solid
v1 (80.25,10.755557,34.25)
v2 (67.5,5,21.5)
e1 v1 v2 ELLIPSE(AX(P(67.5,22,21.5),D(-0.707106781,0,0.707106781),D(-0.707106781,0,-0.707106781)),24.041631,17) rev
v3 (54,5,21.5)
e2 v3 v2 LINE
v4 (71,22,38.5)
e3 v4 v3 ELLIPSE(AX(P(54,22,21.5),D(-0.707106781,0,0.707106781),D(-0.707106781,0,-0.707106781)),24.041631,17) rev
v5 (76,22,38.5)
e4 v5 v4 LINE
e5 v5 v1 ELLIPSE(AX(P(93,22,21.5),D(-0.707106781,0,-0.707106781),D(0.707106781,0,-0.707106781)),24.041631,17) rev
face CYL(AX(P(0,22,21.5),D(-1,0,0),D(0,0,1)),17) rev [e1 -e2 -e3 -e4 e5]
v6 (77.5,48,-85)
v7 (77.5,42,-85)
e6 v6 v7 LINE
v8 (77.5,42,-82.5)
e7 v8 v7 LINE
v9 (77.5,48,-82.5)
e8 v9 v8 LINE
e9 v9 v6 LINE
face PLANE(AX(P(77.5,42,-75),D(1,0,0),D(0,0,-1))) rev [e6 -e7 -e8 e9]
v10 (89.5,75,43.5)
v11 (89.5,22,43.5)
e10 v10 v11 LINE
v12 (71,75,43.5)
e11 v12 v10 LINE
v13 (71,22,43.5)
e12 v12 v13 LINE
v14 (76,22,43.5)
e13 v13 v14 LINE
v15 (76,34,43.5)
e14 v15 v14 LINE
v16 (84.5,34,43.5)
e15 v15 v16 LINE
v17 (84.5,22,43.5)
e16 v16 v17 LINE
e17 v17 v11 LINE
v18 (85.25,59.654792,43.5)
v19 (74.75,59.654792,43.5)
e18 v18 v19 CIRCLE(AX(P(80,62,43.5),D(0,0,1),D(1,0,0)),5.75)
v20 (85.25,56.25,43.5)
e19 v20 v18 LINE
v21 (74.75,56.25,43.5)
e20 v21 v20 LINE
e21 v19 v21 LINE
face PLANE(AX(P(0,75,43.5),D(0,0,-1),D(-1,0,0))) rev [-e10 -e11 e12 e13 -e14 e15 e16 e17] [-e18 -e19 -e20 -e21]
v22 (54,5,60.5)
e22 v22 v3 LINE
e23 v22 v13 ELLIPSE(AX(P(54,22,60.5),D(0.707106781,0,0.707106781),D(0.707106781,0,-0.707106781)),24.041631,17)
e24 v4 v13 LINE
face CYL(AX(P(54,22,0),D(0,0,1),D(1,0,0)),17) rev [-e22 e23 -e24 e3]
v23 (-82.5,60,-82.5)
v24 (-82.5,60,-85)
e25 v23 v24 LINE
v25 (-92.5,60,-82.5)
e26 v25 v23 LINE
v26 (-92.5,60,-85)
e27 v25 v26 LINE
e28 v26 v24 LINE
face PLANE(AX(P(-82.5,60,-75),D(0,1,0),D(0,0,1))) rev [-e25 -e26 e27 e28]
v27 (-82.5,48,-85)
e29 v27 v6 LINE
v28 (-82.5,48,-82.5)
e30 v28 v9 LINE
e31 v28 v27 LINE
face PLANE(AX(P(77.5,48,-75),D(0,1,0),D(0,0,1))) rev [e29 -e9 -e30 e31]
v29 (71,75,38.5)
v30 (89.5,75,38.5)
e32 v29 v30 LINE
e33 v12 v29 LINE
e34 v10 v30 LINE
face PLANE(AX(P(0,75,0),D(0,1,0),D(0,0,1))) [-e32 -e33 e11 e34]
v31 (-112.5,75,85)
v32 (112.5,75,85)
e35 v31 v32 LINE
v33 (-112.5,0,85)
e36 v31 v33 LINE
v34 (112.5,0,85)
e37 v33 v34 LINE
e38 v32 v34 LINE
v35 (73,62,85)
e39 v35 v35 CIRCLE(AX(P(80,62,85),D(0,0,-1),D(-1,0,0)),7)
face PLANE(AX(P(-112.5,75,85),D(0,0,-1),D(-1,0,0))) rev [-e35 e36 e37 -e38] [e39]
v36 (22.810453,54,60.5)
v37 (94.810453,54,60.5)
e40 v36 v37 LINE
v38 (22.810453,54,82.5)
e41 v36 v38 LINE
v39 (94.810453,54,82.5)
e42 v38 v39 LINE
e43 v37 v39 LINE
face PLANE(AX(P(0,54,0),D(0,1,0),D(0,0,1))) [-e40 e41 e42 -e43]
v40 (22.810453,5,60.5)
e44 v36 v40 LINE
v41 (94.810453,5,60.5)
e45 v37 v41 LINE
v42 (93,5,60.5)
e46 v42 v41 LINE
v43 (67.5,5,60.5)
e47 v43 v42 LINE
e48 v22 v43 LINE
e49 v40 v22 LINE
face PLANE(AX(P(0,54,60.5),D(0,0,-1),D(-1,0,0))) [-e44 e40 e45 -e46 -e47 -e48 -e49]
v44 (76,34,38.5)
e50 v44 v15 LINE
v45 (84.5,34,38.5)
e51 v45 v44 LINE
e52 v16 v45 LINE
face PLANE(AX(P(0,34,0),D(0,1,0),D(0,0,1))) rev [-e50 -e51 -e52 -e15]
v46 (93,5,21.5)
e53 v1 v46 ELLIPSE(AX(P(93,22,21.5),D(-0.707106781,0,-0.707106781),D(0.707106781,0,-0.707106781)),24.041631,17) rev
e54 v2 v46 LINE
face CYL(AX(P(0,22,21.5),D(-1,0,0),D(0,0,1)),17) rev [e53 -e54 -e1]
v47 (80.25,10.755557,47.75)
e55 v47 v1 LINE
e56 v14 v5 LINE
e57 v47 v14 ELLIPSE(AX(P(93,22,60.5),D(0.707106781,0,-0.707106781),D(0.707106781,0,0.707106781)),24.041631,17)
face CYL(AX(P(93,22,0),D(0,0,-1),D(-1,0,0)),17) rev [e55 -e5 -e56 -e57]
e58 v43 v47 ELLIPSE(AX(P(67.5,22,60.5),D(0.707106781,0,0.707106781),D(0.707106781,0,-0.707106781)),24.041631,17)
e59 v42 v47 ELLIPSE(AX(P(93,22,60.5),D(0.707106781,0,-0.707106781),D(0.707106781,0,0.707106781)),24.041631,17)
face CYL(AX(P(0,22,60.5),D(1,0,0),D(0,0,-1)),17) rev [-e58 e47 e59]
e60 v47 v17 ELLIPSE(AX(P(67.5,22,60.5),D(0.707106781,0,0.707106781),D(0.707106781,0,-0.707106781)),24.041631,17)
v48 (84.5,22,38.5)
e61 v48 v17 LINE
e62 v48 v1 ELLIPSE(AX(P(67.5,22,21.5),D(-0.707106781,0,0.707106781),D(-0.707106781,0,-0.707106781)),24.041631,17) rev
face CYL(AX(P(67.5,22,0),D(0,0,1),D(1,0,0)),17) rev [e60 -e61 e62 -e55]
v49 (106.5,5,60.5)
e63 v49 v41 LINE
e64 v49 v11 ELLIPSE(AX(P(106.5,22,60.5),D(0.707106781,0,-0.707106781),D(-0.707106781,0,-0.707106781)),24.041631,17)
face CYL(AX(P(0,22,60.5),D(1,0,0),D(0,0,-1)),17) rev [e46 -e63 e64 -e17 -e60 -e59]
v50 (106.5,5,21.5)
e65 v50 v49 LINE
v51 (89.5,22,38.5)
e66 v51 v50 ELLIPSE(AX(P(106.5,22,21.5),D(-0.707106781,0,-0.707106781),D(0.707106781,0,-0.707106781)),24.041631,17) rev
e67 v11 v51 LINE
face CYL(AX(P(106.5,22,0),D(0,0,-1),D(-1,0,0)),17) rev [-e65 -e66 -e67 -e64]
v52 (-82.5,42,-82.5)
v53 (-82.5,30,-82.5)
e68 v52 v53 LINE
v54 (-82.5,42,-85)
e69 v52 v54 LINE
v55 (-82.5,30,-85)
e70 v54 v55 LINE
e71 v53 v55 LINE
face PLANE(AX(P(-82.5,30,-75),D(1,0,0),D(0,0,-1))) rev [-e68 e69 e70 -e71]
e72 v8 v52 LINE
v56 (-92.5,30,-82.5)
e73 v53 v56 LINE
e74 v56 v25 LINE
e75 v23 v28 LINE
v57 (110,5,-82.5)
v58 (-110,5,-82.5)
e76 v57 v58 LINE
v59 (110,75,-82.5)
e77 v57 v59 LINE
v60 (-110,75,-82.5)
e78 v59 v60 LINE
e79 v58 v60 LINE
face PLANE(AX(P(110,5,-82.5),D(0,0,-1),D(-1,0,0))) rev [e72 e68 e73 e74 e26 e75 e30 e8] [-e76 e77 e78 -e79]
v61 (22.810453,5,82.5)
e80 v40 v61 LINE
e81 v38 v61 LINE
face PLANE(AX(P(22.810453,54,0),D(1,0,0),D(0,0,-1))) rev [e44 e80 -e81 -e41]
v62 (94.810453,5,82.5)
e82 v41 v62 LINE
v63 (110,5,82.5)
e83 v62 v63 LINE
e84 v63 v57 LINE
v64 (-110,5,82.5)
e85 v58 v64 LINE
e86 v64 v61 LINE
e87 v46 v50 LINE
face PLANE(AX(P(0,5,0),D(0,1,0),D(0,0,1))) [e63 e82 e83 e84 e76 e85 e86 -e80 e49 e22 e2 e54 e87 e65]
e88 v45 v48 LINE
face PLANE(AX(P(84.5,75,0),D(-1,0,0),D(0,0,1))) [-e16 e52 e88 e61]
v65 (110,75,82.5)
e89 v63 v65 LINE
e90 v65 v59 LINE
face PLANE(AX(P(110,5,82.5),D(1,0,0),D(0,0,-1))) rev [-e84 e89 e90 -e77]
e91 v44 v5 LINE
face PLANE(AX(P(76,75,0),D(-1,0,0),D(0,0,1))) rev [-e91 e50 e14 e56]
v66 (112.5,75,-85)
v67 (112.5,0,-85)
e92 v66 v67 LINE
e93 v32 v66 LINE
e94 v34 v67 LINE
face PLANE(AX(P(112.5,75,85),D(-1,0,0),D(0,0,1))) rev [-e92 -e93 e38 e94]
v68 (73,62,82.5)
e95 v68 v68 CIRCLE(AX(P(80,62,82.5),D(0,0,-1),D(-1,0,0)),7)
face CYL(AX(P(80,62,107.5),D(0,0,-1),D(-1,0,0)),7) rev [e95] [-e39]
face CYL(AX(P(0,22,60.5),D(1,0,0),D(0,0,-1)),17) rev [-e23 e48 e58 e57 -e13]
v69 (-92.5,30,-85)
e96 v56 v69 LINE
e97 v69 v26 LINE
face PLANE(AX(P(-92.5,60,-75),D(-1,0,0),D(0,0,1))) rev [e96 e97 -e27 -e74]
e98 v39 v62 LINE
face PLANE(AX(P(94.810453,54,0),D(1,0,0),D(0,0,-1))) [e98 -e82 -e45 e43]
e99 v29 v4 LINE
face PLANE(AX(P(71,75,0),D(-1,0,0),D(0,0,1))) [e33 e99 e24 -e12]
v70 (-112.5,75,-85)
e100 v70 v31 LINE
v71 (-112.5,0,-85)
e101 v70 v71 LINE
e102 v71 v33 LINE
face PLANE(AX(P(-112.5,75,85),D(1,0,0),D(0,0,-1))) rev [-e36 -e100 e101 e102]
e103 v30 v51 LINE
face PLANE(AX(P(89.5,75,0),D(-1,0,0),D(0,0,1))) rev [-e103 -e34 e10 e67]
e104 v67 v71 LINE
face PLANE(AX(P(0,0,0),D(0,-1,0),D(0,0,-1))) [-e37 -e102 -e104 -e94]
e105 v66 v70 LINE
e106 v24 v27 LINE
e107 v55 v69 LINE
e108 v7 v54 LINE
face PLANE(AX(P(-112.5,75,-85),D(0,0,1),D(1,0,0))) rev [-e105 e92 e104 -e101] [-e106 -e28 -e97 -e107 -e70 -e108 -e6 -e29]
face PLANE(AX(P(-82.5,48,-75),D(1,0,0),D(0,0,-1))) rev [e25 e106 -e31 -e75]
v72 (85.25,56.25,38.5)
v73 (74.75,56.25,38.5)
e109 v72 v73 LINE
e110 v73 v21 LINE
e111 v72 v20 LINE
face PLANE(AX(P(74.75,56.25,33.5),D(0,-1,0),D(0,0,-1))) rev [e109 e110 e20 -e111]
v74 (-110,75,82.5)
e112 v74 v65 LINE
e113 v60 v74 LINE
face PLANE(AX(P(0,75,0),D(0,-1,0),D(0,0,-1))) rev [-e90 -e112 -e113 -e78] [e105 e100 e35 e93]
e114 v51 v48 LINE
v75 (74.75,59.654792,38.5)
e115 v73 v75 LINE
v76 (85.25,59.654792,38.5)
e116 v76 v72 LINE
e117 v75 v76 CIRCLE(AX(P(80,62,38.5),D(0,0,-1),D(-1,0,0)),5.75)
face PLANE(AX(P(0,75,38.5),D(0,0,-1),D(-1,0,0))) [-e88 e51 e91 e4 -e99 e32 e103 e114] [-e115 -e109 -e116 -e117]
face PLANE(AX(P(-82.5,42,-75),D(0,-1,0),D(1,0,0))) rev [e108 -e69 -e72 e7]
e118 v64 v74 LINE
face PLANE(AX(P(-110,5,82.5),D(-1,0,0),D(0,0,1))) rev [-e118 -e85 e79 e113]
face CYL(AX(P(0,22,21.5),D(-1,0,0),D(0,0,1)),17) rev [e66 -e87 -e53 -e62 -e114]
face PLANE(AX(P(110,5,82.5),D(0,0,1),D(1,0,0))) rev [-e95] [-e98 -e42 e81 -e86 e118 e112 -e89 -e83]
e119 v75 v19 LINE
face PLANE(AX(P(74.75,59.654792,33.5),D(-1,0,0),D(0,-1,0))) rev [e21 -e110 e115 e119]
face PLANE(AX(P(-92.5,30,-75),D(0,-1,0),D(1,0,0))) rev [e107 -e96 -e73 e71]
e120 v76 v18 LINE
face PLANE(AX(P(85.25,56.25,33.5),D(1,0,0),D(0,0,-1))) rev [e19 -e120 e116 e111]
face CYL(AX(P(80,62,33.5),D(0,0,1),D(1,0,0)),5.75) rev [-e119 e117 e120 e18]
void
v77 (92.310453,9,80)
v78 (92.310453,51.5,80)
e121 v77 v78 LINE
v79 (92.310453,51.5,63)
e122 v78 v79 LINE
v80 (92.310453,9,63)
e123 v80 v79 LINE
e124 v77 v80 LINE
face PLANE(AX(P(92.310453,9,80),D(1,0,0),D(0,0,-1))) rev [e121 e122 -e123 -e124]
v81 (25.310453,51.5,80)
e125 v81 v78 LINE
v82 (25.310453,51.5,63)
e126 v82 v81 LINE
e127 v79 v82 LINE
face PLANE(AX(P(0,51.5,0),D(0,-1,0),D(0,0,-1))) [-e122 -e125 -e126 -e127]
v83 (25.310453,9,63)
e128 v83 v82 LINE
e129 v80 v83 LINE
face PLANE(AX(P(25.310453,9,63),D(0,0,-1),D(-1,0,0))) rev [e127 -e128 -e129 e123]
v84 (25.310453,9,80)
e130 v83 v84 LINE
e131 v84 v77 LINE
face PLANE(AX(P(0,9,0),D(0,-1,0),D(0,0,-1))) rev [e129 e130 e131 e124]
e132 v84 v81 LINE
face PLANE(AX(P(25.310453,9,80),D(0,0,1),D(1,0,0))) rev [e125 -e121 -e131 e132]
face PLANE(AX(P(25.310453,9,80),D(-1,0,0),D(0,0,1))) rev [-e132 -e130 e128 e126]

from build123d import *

# Parameters (mm, degrees)
SKETCH1_W                = 225
SKETCH1_H                = 170
BOSS_EXTRUDE1_DEPTH      = 75
SKETCH2_W                = 220
SKETCH2_H                = 165
CUT_EXTRUDE1_DEPTH       = 70
CUT_EXTRUDE2_DEPTH       = 10
SKETCH6_W                = 72
SKETCH6_H                = 22
BOSS_EXTRUDE2_DEPTH      = 49
SKETCH8_R                = 7
CUT_EXTRUDE3_DEPTH       = 25
SKETCH6_4_W              = 5
SKETCH6_4_H              = 5
BOSS_EXTRUDE4_DEPTH      = 70
BOSS_EXTRUDE5_DEPTH      = 40
BOSS_EXTRUDE5_DEPTH_BACK = 1
BOSS_EXTRUDE5_START      = 30
SKETCH11_W               = 8.5
SKETCH11_H               = 5
CUT_EXTRUDE4_DEPTH       = 10
CUT_EXTRUDE5_START       = -2.5
SKETCH13_W               = 67
SKETCH13_H               = 17
CUT_EXTRUDE5_DEPTH       = 42.5
FILLET1_R                = 17


with BuildPart() as part:
    # Sketch1 → Boss-Extrude1 (new body)
    with BuildSketch(Plane(origin=(0, 0, 0), x_dir=(1, 0, 0), z_dir=(0, 1, 0))):
        Rectangle(SKETCH1_W, SKETCH1_H)
    extrude(amount=BOSS_EXTRUDE1_DEPTH)

    # Sketch2 → Cut-Extrude1 (cut)
    with BuildSketch(Plane(origin=(0, 75, 0), x_dir=(1, 0, 0), z_dir=(0, 1, 0))):
        Rectangle(SKETCH2_W, SKETCH2_H)
    extrude(amount=-CUT_EXTRUDE1_DEPTH, mode=Mode.SUBTRACT)

    # Sketch5 → Cut-Extrude2 (cut)
    with BuildSketch(Plane(origin=(0, 0, -85), x_dir=(-1, 0, 0), z_dir=(0, 0, -1))):
        Polygon((92.5, 60), (92.5, 30), (82.5, 30), (82.5, 42), (-77.5, 42), (-77.5, 48), (82.5, 48), (82.5, 60), align=None)
    extrude(amount=-CUT_EXTRUDE2_DEPTH, mode=Mode.SUBTRACT)

    # Sketch6 → Boss-Extrude2 (add)
    with BuildSketch(Plane(origin=(0, 5, 0), x_dir=(1, 0, 0), z_dir=(0, 1, 0))):
        with Locations((58.810452566, -71.5)):
            Rectangle(SKETCH6_W, SKETCH6_H)
    extrude(amount=BOSS_EXTRUDE2_DEPTH)

    # Sketch8 → Cut-Extrude3 (cut)
    with BuildSketch(Plane(origin=(0, 0, 82.5), x_dir=(-1, 0, 0), z_dir=(0, 0, -1))):
        with Locations((-80, 62)):
            Circle(SKETCH8_R)
    extrude(amount=-CUT_EXTRUDE3_DEPTH, mode=Mode.SUBTRACT)

    # Sketch6<4> → Boss-Extrude4 (add)
    with BuildSketch(Plane(origin=(0, 5, 0), x_dir=(1, 0, 0), z_dir=(0, 1, 0))):
        with Locations((73.5, -41)):
            Rectangle(SKETCH6_4_W, SKETCH6_4_H)
        with Locations((87, -41)):
            Rectangle(SKETCH6_4_W, SKETCH6_4_H)
    extrude(amount=BOSS_EXTRUDE4_DEPTH)

    # Sketch11 → Boss-Extrude5 (add, two sides: drawn at the far end of the back side and taken through both)
    with BuildSketch(Plane(origin=(0, 5, 0), x_dir=(1, 0, 0), z_dir=(0, 1, 0)).offset(BOSS_EXTRUDE5_START - BOSS_EXTRUDE5_DEPTH_BACK)):
        with Locations((80.25, -41)):
            Rectangle(SKETCH11_W, SKETCH11_H)
    extrude(amount=BOSS_EXTRUDE5_DEPTH + BOSS_EXTRUDE5_DEPTH_BACK)

    # Sketch12 → Cut-Extrude4 (cut)
    with BuildSketch(Plane.XY.offset(43.5)):
        with BuildLine():
            Line((74.75, 59.65479212), (74.75, 56.25))
            Line((74.75, 56.25), (85.25, 56.25))
            Line((85.25, 56.25), (85.25, 59.65479212))
            ThreePointArc((85.25, 59.65479212), (80, 67.75), (74.75, 59.65479212))
        make_face()
    extrude(amount=-CUT_EXTRUDE4_DEPTH, mode=Mode.SUBTRACT)

    # Sketch13 → Cut-Extrude5 (cut)
    with BuildSketch(Plane(origin=(0, 54, 0), x_dir=(1, 0, 0), z_dir=(0, 1, 0)).offset(CUT_EXTRUDE5_START)):
        with Locations((58.810452566, -71.5)):
            Rectangle(SKETCH13_W, SKETCH13_H)
    extrude(amount=-CUT_EXTRUDE5_DEPTH, mode=Mode.SUBTRACT)

    # Fillet1
    # the kernel refuses this fillet: 17 mm, written as the material it adds along each edge
    with BuildSketch(Plane(origin=(84.5, 5, 38.5), x_dir=(-1, 0, 0), z_dir=(0, 0, 1)), Plane(origin=(89.5, 5, 38.5), x_dir=(0, 0, -1), z_dir=(-1, 0, 0)), Plane(origin=(71, 5, 43.5), x_dir=(0, 0, 1), z_dir=(1, 0, 0)), Plane(origin=(76, 5, 43.5), x_dir=(1, 0, 0), z_dir=(0, 0, -1)), Plane(origin=(71, 5, 38.5), x_dir=(-1, 0, 0), z_dir=(0, 0, 1)), Plane(origin=(76, 5, 38.5), x_dir=(0, 0, -1), z_dir=(-1, 0, 0)), Plane(origin=(84.5, 5, 43.5), x_dir=(0, 0, 1), z_dir=(1, 0, 0)), Plane(origin=(89.5, 5, 43.5), x_dir=(1, 0, 0), z_dir=(0, 0, -1))) as fillet1_piece_1:
        with BuildLine():
            CenterArc((FILLET1_R, -FILLET1_R), FILLET1_R, 90, 90)
            Line((0, -FILLET1_R), (-FILLET1_R * 0.02, -FILLET1_R))
            Line((-FILLET1_R * 0.02, -FILLET1_R), (-FILLET1_R * 0.02, FILLET1_R * 0.02))
            Line((-FILLET1_R * 0.02, FILLET1_R * 0.02), (FILLET1_R, FILLET1_R * 0.02))
            Line((FILLET1_R, FILLET1_R * 0.02), (FILLET1_R, 0))
        make_face()
    extrude(amount=5)
    with BuildSketch(Plane(origin=(84.5, 5, -4), x_dir=(-1, 0, 0), z_dir=(0, 0, 1))) as fillet1_piece_2a_section:
        with BuildLine():
            CenterArc((FILLET1_R, -FILLET1_R), FILLET1_R, 90, 90)
            Line((0, -FILLET1_R), (-FILLET1_R * 0.02, -FILLET1_R))
            Line((-FILLET1_R * 0.02, -FILLET1_R), (-FILLET1_R * 0.02, FILLET1_R * 0.02))
            Line((-FILLET1_R * 0.02, FILLET1_R * 0.02), (FILLET1_R, FILLET1_R * 0.02))
            Line((FILLET1_R, FILLET1_R * 0.02), (FILLET1_R, 0))
        make_face()
    fillet1_piece_2a = extrude(amount=47.5, mode=Mode.PRIVATE)
    fillet1_piece_2a = split(fillet1_piece_2a, bisect_by=Plane(origin=(80.651283057, 8.848716943, 38.5), z_dir=(0, 0, -1)), keep=Keep.TOP, mode=Mode.PRIVATE)
    with BuildSketch(Plane(origin=(89.5, 5, 38.5), x_dir=(0, 0, -1), z_dir=(-1, 0, 0))) as fillet1_piece_2b_section:
        with BuildLine():
            CenterArc((FILLET1_R, -FILLET1_R), FILLET1_R, 90, 90)
            Line((0, -FILLET1_R), (-FILLET1_R * 0.02, -FILLET1_R))
            Line((-FILLET1_R * 0.02, -FILLET1_R), (-FILLET1_R * 0.02, FILLET1_R * 0.02))
            Line((-FILLET1_R * 0.02, FILLET1_R * 0.02), (FILLET1_R, FILLET1_R * 0.02))
            Line((FILLET1_R, FILLET1_R * 0.02), (FILLET1_R, 0))
        make_face()
    fillet1_piece_2b = extrude(amount=47.5, mode=Mode.PRIVATE)
    fillet1_piece_2b = split(fillet1_piece_2b, bisect_by=Plane(origin=(84.5, 8.848716943, 34.651283057), z_dir=(-1, 0, 0)), keep=Keep.TOP, mode=Mode.PRIVATE)
    fillet1_piece_2 = fillet1_piece_2a & fillet1_piece_2b
    add(fillet1_piece_2)
    with BuildSketch(Plane(origin=(84.5, 5, 38.5), x_dir=(-1, 0, 0), z_dir=(0, 0, 1))) as fillet1_piece_3a_section:
        with BuildLine():
            CenterArc((FILLET1_R, -FILLET1_R), FILLET1_R, 90, 90)
            Line((0, -FILLET1_R), (-FILLET1_R * 0.02, -FILLET1_R))
            Line((-FILLET1_R * 0.02, -FILLET1_R), (-FILLET1_R * 0.02, FILLET1_R * 0.02))
            Line((-FILLET1_R * 0.02, FILLET1_R * 0.02), (FILLET1_R, FILLET1_R * 0.02))
            Line((FILLET1_R, FILLET1_R * 0.02), (FILLET1_R, 0))
        make_face()
    fillet1_piece_3a = extrude(amount=47.5, mode=Mode.PRIVATE)
    fillet1_piece_3a = split(fillet1_piece_3a, bisect_by=Plane(origin=(80.651283057, 8.848716943, 43.5), z_dir=(0, 0, 1)), keep=Keep.TOP, mode=Mode.PRIVATE)
    with BuildSketch(Plane(origin=(42, 5, 43.5), x_dir=(0, 0, 1), z_dir=(1, 0, 0))) as fillet1_piece_3b_section:
        with BuildLine():
            CenterArc((FILLET1_R, -FILLET1_R), FILLET1_R, 90, 90)
            Line((0, -FILLET1_R), (-FILLET1_R * 0.02, -FILLET1_R))
            Line((-FILLET1_R * 0.02, -FILLET1_R), (-FILLET1_R * 0.02, FILLET1_R * 0.02))
            Line((-FILLET1_R * 0.02, FILLET1_R * 0.02), (FILLET1_R, FILLET1_R * 0.02))
            Line((FILLET1_R, FILLET1_R * 0.02), (FILLET1_R, 0))
        make_face()
    fillet1_piece_3b = extrude(amount=47.5, mode=Mode.PRIVATE)
    fillet1_piece_3b = split(fillet1_piece_3b, bisect_by=Plane(origin=(84.5, 8.848716943, 47.348716943), z_dir=(-1, 0, 0)), keep=Keep.TOP, mode=Mode.PRIVATE)
    fillet1_piece_3 = fillet1_piece_3a & fillet1_piece_3b
    add(fillet1_piece_3)
    with BuildSketch(Plane(origin=(132, 5, 38.5), x_dir=(0, 0, -1), z_dir=(-1, 0, 0))) as fillet1_piece_4a_section:
        with BuildLine():
            CenterArc((FILLET1_R, -FILLET1_R), FILLET1_R, 90, 90)
            Line((0, -FILLET1_R), (-FILLET1_R * 0.02, -FILLET1_R))
            Line((-FILLET1_R * 0.02, -FILLET1_R), (-FILLET1_R * 0.02, FILLET1_R * 0.02))
            Line((-FILLET1_R * 0.02, FILLET1_R * 0.02), (FILLET1_R, FILLET1_R * 0.02))
            Line((FILLET1_R, FILLET1_R * 0.02), (FILLET1_R, 0))
        make_face()
    fillet1_piece_4a = extrude(amount=47.5, mode=Mode.PRIVATE)
    fillet1_piece_4a = split(fillet1_piece_4a, bisect_by=Plane(origin=(89.5, 8.848716943, 34.651283057), z_dir=(1, 0, 0)), keep=Keep.TOP, mode=Mode.PRIVATE)
    with BuildSketch(Plane(origin=(89.5, 5, 43.5), x_dir=(1, 0, 0), z_dir=(0, 0, -1))) as fillet1_piece_4b_section:
        with BuildLine():
            CenterArc((FILLET1_R, -FILLET1_R), FILLET1_R, 90, 90)
            Line((0, -FILLET1_R), (-FILLET1_R * 0.02, -FILLET1_R))
            Line((-FILLET1_R * 0.02, -FILLET1_R), (-FILLET1_R * 0.02, FILLET1_R * 0.02))
            Line((-FILLET1_R * 0.02, FILLET1_R * 0.02), (FILLET1_R, FILLET1_R * 0.02))
            Line((FILLET1_R, FILLET1_R * 0.02), (FILLET1_R, 0))
        make_face()
    fillet1_piece_4b = extrude(amount=47.5, mode=Mode.PRIVATE)
    fillet1_piece_4b = split(fillet1_piece_4b, bisect_by=Plane(origin=(93.348716943, 8.848716943, 38.5), z_dir=(0, 0, -1)), keep=Keep.TOP, mode=Mode.PRIVATE)
    fillet1_piece_4 = fillet1_piece_4a & fillet1_piece_4b
    add(fillet1_piece_4)
    with BuildSketch(Plane(origin=(71, 5, 38.5), x_dir=(-1, 0, 0), z_dir=(0, 0, 1))) as fillet1_piece_5a_section:
        with BuildLine():
            CenterArc((FILLET1_R, -FILLET1_R), FILLET1_R, 90, 90)
            Line((0, -FILLET1_R), (-FILLET1_R * 0.02, -FILLET1_R))
            Line((-FILLET1_R * 0.02, -FILLET1_R), (-FILLET1_R * 0.02, FILLET1_R * 0.02))
            Line((-FILLET1_R * 0.02, FILLET1_R * 0.02), (FILLET1_R, FILLET1_R * 0.02))
            Line((FILLET1_R, FILLET1_R * 0.02), (FILLET1_R, 0))
        make_face()
    fillet1_piece_5a = extrude(amount=47.5, mode=Mode.PRIVATE)
    fillet1_piece_5a = split(fillet1_piece_5a, bisect_by=Plane(origin=(67.151283057, 8.848716943, 43.5), z_dir=(0, 0, 1)), keep=Keep.TOP, mode=Mode.PRIVATE)
    with BuildSketch(Plane(origin=(28.5, 5, 43.5), x_dir=(0, 0, 1), z_dir=(1, 0, 0))) as fillet1_piece_5b_section:
        with BuildLine():
            CenterArc((FILLET1_R, -FILLET1_R), FILLET1_R, 90, 90)
            Line((0, -FILLET1_R), (-FILLET1_R * 0.02, -FILLET1_R))
            Line((-FILLET1_R * 0.02, -FILLET1_R), (-FILLET1_R * 0.02, FILLET1_R * 0.02))
            Line((-FILLET1_R * 0.02, FILLET1_R * 0.02), (FILLET1_R, FILLET1_R * 0.02))
            Line((FILLET1_R, FILLET1_R * 0.02), (FILLET1_R, 0))
        make_face()
    fillet1_piece_5b = extrude(amount=47.5, mode=Mode.PRIVATE)
    fillet1_piece_5b = split(fillet1_piece_5b, bisect_by=Plane(origin=(71, 8.848716943, 47.348716943), z_dir=(-1, 0, 0)), keep=Keep.TOP, mode=Mode.PRIVATE)
    fillet1_piece_5 = fillet1_piece_5a & fillet1_piece_5b
    add(fillet1_piece_5)
    with BuildSketch(Plane(origin=(76, 5, 86), x_dir=(1, 0, 0), z_dir=(0, 0, -1))) as fillet1_piece_6a_section:
        with BuildLine():
            CenterArc((FILLET1_R, -FILLET1_R), FILLET1_R, 90, 90)
            Line((0, -FILLET1_R), (-FILLET1_R * 0.02, -FILLET1_R))
            Line((-FILLET1_R * 0.02, -FILLET1_R), (-FILLET1_R * 0.02, FILLET1_R * 0.02))
            Line((-FILLET1_R * 0.02, FILLET1_R * 0.02), (FILLET1_R, FILLET1_R * 0.02))
            Line((FILLET1_R, FILLET1_R * 0.02), (FILLET1_R, 0))
        make_face()
    fillet1_piece_6a = extrude(amount=47.5, mode=Mode.PRIVATE)
    fillet1_piece_6a = split(fillet1_piece_6a, bisect_by=Plane(origin=(79.848716943, 8.848716943, 43.5), z_dir=(0, 0, 1)), keep=Keep.TOP, mode=Mode.PRIVATE)
    with BuildSketch(Plane(origin=(71, 5, 43.5), x_dir=(0, 0, 1), z_dir=(1, 0, 0))) as fillet1_piece_6b_section:
        with BuildLine():
            CenterArc((FILLET1_R, -FILLET1_R), FILLET1_R, 90, 90)
            Line((0, -FILLET1_R), (-FILLET1_R * 0.02, -FILLET1_R))
            Line((-FILLET1_R * 0.02, -FILLET1_R), (-FILLET1_R * 0.02, FILLET1_R * 0.02))
            Line((-FILLET1_R * 0.02, FILLET1_R * 0.02), (FILLET1_R, FILLET1_R * 0.02))
            Line((FILLET1_R, FILLET1_R * 0.02), (FILLET1_R, 0))
        make_face()
    fillet1_piece_6b = extrude(amount=47.5, mode=Mode.PRIVATE)
    fillet1_piece_6b = split(fillet1_piece_6b, bisect_by=Plane(origin=(76, 8.848716943, 47.348716943), z_dir=(1, 0, 0)), keep=Keep.TOP, mode=Mode.PRIVATE)
    fillet1_piece_6 = fillet1_piece_6a & fillet1_piece_6b
    add(fillet1_piece_6)
    with BuildSketch(Plane(origin=(118.5, 5, 38.5), x_dir=(0, 0, -1), z_dir=(-1, 0, 0))) as fillet1_piece_7a_section:
        with BuildLine():
            CenterArc((FILLET1_R, -FILLET1_R), FILLET1_R, 90, 90)
            Line((0, -FILLET1_R), (-FILLET1_R * 0.02, -FILLET1_R))
            Line((-FILLET1_R * 0.02, -FILLET1_R), (-FILLET1_R * 0.02, FILLET1_R * 0.02))
            Line((-FILLET1_R * 0.02, FILLET1_R * 0.02), (FILLET1_R, FILLET1_R * 0.02))
            Line((FILLET1_R, FILLET1_R * 0.02), (FILLET1_R, 0))
        make_face()
    fillet1_piece_7a = extrude(amount=47.5, mode=Mode.PRIVATE)
    fillet1_piece_7a = split(fillet1_piece_7a, bisect_by=Plane(origin=(76, 8.848716943, 34.651283057), z_dir=(1, 0, 0)), keep=Keep.TOP, mode=Mode.PRIVATE)
    with BuildSketch(Plane(origin=(76, 5, 43.5), x_dir=(1, 0, 0), z_dir=(0, 0, -1))) as fillet1_piece_7b_section:
        with BuildLine():
            CenterArc((FILLET1_R, -FILLET1_R), FILLET1_R, 90, 90)
            Line((0, -FILLET1_R), (-FILLET1_R * 0.02, -FILLET1_R))
            Line((-FILLET1_R * 0.02, -FILLET1_R), (-FILLET1_R * 0.02, FILLET1_R * 0.02))
            Line((-FILLET1_R * 0.02, FILLET1_R * 0.02), (FILLET1_R, FILLET1_R * 0.02))
            Line((FILLET1_R, FILLET1_R * 0.02), (FILLET1_R, 0))
        make_face()
    fillet1_piece_7b = extrude(amount=47.5, mode=Mode.PRIVATE)
    fillet1_piece_7b = split(fillet1_piece_7b, bisect_by=Plane(origin=(79.848716943, 8.848716943, 38.5), z_dir=(0, 0, -1)), keep=Keep.TOP, mode=Mode.PRIVATE)
    fillet1_piece_7 = fillet1_piece_7a & fillet1_piece_7b
    add(fillet1_piece_7)
    with BuildSketch(Plane(origin=(71, 5, -4), x_dir=(-1, 0, 0), z_dir=(0, 0, 1))) as fillet1_piece_8a_section:
        with BuildLine():
            CenterArc((FILLET1_R, -FILLET1_R), FILLET1_R, 90, 90)
            Line((0, -FILLET1_R), (-FILLET1_R * 0.02, -FILLET1_R))
            Line((-FILLET1_R * 0.02, -FILLET1_R), (-FILLET1_R * 0.02, FILLET1_R * 0.02))
            Line((-FILLET1_R * 0.02, FILLET1_R * 0.02), (FILLET1_R, FILLET1_R * 0.02))
            Line((FILLET1_R, FILLET1_R * 0.02), (FILLET1_R, 0))
        make_face()
    fillet1_piece_8a = extrude(amount=47.5, mode=Mode.PRIVATE)
    fillet1_piece_8a = split(fillet1_piece_8a, bisect_by=Plane(origin=(67.151283057, 8.848716943, 38.5), z_dir=(0, 0, -1)), keep=Keep.TOP, mode=Mode.PRIVATE)
    with BuildSketch(Plane(origin=(76, 5, 38.5), x_dir=(0, 0, -1), z_dir=(-1, 0, 0))) as fillet1_piece_8b_section:
        with BuildLine():
            CenterArc((FILLET1_R, -FILLET1_R), FILLET1_R, 90, 90)
            Line((0, -FILLET1_R), (-FILLET1_R * 0.02, -FILLET1_R))
            Line((-FILLET1_R * 0.02, -FILLET1_R), (-FILLET1_R * 0.02, FILLET1_R * 0.02))
            Line((-FILLET1_R * 0.02, FILLET1_R * 0.02), (FILLET1_R, FILLET1_R * 0.02))
            Line((FILLET1_R, FILLET1_R * 0.02), (FILLET1_R, 0))
        make_face()
    fillet1_piece_8b = extrude(amount=47.5, mode=Mode.PRIVATE)
    fillet1_piece_8b = split(fillet1_piece_8b, bisect_by=Plane(origin=(71, 8.848716943, 34.651283057), z_dir=(-1, 0, 0)), keep=Keep.TOP, mode=Mode.PRIVATE)
    fillet1_piece_8 = fillet1_piece_8a & fillet1_piece_8b
    add(fillet1_piece_8)
    with BuildSketch(Plane(origin=(89.5, 5, 86), x_dir=(1, 0, 0), z_dir=(0, 0, -1))) as fillet1_piece_9a_section:
        with BuildLine():
            CenterArc((FILLET1_R, -FILLET1_R), FILLET1_R, 90, 90)
            Line((0, -FILLET1_R), (-FILLET1_R * 0.02, -FILLET1_R))
            Line((-FILLET1_R * 0.02, -FILLET1_R), (-FILLET1_R * 0.02, FILLET1_R * 0.02))
            Line((-FILLET1_R * 0.02, FILLET1_R * 0.02), (FILLET1_R, FILLET1_R * 0.02))
            Line((FILLET1_R, FILLET1_R * 0.02), (FILLET1_R, 0))
        make_face()
    fillet1_piece_9a = extrude(amount=47.5, mode=Mode.PRIVATE)
    fillet1_piece_9a = split(fillet1_piece_9a, bisect_by=Plane(origin=(93.348716943, 8.848716943, 43.5), z_dir=(0, 0, 1)), keep=Keep.TOP, mode=Mode.PRIVATE)
    with BuildSketch(Plane(origin=(84.5, 5, 43.5), x_dir=(0, 0, 1), z_dir=(1, 0, 0))) as fillet1_piece_9b_section:
        with BuildLine():
            CenterArc((FILLET1_R, -FILLET1_R), FILLET1_R, 90, 90)
            Line((0, -FILLET1_R), (-FILLET1_R * 0.02, -FILLET1_R))
            Line((-FILLET1_R * 0.02, -FILLET1_R), (-FILLET1_R * 0.02, FILLET1_R * 0.02))
            Line((-FILLET1_R * 0.02, FILLET1_R * 0.02), (FILLET1_R, FILLET1_R * 0.02))
            Line((FILLET1_R, FILLET1_R * 0.02), (FILLET1_R, 0))
        make_face()
    fillet1_piece_9b = extrude(amount=47.5, mode=Mode.PRIVATE)
    fillet1_piece_9b = split(fillet1_piece_9b, bisect_by=Plane(origin=(89.5, 8.848716943, 47.348716943), z_dir=(1, 0, 0)), keep=Keep.TOP, mode=Mode.PRIVATE)
    fillet1_piece_9 = fillet1_piece_9a & fillet1_piece_9b
    add(fillet1_piece_9)


solid = part.part
